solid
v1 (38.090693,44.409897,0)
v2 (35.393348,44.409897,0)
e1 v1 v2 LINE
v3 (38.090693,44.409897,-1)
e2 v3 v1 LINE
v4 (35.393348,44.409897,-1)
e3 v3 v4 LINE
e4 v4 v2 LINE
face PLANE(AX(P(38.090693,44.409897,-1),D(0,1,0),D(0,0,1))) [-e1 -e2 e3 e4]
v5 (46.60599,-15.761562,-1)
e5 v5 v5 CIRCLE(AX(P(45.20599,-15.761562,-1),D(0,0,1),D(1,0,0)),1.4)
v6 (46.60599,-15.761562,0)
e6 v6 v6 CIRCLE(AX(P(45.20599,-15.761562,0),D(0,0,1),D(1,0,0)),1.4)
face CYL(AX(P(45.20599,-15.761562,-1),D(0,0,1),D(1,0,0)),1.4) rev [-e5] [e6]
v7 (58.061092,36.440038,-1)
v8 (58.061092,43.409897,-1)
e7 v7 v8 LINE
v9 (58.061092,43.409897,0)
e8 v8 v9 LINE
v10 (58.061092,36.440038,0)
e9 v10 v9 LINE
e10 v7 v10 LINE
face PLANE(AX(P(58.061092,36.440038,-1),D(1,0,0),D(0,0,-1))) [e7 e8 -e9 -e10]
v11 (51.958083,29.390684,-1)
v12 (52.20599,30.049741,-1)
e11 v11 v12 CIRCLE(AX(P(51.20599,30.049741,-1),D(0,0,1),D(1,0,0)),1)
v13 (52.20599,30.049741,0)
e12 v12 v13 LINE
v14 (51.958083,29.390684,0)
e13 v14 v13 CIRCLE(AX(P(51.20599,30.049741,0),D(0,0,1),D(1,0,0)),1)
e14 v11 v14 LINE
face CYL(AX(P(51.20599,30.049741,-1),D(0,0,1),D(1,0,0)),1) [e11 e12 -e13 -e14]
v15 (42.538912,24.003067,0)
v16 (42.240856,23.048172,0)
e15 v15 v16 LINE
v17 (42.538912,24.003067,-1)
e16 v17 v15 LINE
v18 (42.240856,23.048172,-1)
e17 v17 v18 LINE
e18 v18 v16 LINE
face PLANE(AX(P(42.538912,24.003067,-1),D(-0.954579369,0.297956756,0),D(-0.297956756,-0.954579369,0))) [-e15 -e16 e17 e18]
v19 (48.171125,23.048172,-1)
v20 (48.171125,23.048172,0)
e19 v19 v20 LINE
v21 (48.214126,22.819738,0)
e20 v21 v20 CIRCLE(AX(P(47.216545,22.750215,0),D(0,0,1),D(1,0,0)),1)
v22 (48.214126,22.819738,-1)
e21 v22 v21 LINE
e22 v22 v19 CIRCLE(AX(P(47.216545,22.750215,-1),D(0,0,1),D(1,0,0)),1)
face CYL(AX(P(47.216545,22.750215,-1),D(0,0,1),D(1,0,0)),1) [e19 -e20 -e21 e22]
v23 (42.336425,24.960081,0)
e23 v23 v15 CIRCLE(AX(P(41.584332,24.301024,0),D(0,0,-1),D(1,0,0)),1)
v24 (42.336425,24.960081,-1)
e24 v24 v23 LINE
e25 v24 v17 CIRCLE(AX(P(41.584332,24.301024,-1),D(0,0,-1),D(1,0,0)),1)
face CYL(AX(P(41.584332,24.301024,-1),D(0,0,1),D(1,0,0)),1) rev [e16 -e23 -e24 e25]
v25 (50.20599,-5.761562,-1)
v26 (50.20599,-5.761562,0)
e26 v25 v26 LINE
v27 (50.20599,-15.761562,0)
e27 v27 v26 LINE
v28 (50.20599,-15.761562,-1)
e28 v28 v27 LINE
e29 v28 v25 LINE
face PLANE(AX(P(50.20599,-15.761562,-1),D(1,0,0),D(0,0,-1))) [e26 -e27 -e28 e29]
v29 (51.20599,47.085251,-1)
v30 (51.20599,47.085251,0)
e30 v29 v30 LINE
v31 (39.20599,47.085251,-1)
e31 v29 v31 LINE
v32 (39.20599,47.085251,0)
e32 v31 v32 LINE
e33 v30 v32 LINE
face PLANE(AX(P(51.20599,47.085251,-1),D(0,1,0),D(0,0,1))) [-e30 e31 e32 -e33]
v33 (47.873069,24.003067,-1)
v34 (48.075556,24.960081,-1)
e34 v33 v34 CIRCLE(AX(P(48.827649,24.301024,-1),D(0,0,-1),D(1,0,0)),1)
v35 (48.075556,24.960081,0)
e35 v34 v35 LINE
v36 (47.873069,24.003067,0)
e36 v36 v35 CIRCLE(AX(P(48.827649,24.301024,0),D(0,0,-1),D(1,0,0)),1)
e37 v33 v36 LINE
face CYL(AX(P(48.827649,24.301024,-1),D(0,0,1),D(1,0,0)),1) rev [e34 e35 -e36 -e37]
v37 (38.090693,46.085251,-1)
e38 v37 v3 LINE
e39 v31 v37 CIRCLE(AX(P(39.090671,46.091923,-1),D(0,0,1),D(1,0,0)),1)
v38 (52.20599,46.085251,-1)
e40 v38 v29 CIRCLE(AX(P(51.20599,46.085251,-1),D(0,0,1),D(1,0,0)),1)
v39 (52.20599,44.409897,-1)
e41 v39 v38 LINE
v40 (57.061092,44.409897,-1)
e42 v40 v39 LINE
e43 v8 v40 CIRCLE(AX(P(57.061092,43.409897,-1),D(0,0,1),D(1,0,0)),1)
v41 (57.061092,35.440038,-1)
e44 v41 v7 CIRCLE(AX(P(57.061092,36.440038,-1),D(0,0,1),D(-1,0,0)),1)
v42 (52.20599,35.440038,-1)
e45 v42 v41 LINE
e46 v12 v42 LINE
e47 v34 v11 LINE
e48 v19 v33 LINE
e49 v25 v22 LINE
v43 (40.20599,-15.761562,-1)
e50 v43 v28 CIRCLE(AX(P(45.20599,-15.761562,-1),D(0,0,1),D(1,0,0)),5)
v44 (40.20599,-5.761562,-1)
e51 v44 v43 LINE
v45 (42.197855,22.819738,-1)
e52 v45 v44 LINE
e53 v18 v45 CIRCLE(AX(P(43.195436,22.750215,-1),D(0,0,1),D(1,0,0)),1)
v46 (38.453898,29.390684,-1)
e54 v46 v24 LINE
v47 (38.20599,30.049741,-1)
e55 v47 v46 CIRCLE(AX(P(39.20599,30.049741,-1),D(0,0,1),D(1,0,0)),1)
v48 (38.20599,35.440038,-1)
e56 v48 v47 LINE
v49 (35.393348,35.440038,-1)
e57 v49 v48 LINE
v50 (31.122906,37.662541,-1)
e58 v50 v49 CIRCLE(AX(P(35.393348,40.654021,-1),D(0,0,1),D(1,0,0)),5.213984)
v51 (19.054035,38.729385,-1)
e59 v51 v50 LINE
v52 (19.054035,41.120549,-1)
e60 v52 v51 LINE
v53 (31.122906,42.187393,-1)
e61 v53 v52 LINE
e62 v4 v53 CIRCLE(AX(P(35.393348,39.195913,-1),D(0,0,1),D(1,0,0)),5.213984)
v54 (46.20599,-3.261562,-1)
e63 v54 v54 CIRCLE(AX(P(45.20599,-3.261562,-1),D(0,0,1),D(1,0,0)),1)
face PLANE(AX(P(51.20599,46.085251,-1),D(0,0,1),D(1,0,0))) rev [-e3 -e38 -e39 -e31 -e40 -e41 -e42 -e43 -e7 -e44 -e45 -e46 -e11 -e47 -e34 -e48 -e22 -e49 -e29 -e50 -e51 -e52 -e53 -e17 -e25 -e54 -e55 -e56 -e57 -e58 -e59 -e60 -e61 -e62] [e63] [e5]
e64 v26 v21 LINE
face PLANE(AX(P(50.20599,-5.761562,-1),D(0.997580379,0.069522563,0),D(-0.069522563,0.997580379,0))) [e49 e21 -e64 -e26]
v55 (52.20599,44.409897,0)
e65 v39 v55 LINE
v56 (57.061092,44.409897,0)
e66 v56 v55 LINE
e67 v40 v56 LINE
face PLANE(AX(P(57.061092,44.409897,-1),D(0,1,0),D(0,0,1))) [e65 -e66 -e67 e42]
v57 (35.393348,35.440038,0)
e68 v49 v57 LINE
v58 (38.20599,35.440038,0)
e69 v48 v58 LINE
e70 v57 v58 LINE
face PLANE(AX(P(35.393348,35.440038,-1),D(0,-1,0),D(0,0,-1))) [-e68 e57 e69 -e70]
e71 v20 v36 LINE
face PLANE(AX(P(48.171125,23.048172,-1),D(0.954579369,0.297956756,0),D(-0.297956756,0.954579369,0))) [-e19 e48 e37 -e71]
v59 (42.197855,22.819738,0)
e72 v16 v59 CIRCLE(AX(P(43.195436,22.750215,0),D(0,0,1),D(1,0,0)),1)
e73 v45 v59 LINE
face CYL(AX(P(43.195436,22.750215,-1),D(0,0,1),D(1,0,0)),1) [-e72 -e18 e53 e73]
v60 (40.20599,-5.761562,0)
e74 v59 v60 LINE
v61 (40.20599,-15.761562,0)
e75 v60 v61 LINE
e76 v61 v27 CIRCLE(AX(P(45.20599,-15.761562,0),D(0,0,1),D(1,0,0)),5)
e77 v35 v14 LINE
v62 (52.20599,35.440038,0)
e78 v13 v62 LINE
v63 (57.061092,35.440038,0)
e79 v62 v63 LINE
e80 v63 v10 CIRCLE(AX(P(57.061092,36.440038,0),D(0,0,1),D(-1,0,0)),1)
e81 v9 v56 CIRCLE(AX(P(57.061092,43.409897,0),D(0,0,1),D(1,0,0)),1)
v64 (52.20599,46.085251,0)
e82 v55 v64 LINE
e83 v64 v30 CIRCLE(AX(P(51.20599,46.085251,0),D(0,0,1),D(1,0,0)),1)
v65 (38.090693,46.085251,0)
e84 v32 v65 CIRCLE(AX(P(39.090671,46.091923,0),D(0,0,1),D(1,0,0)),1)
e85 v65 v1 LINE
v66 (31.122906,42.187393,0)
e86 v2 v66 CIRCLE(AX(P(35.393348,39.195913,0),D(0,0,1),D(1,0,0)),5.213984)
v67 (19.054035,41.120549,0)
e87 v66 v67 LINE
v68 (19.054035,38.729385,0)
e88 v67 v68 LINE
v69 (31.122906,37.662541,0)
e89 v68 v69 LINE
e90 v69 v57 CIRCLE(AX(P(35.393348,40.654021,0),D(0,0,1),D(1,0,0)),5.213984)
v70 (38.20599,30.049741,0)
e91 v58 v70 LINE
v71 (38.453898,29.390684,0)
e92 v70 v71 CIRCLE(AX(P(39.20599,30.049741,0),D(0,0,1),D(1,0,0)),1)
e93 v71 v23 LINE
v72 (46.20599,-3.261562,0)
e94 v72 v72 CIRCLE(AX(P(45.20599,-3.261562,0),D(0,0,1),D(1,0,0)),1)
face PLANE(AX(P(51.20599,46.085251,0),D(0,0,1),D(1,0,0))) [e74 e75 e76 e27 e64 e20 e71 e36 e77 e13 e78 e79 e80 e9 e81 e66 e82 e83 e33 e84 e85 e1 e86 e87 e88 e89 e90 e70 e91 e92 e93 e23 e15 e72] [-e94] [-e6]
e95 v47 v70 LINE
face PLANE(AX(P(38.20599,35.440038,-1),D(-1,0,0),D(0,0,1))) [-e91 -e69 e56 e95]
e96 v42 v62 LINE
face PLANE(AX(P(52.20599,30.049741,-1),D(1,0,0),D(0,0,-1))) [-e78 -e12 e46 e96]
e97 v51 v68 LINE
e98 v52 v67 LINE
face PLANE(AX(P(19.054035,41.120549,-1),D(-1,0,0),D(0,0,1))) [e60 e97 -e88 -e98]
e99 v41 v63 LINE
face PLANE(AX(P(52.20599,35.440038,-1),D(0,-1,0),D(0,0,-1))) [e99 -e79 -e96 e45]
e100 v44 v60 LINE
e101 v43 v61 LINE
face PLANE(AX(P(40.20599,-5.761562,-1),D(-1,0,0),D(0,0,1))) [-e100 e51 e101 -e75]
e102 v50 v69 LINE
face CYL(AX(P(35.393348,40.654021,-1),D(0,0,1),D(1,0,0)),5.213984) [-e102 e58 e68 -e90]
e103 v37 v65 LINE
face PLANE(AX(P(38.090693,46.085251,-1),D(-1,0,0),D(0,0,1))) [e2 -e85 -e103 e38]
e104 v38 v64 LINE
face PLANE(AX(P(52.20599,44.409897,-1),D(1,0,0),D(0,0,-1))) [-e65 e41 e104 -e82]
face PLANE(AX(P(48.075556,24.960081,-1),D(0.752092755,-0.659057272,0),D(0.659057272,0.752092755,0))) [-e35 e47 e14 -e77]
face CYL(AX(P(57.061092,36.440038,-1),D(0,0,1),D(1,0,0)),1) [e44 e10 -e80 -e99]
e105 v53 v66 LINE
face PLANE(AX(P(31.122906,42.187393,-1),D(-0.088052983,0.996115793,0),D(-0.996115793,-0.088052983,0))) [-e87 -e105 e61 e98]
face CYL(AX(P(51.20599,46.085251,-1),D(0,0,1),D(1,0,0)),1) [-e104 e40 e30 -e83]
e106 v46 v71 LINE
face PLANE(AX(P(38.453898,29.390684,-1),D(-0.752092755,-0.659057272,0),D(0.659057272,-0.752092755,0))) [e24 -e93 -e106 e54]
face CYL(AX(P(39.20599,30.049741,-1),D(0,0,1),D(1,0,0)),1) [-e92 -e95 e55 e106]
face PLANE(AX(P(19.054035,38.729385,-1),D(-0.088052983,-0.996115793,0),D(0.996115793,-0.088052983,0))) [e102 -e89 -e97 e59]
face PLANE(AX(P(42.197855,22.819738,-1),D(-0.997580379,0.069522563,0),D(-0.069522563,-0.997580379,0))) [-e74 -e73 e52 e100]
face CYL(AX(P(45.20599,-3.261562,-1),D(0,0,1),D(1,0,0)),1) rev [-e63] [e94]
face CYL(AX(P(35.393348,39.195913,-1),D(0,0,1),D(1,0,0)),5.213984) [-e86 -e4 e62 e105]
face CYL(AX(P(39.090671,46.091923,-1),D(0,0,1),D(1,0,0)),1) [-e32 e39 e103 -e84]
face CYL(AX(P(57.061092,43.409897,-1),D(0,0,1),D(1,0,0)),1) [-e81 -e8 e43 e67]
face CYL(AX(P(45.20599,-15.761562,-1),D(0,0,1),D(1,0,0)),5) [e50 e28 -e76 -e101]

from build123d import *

# Parameters (mm, degrees)
MODEL_R           = 1
MODEL_R_2         = 1.4
BRIDA_BASE1_DEPTH = 1


# Sheet-metal steps are written as plain solids
with BuildPart() as part:
    # Model → Brida base1 (new body)
    with BuildSketch(Plane.XY):
        with BuildLine():
            Line((57.06109229, 44.40989684), (52.2059904, 44.40989684))
            Line((52.2059904, 44.40989684), (52.2059904, 46.085251303))
            ThreePointArc((52.2059904, 46.085251303), (51.913097181, 46.792358084), (51.2059904, 47.085251303))
            Line((51.2059904, 47.085251303), (39.2059904, 47.085251303))
            ThreePointArc((39.2059904, 47.085251303), (38.423096783, 46.836466455), (38.090692903, 46.085251454))
            Line((38.090692903, 46.085251454), (38.090692903, 44.40989684))
            Line((38.090692903, 44.40989684), (35.393347813, 44.40989684))
            ThreePointArc((35.393347813, 44.40989684), (32.986264566, 43.82101601), (31.122905732, 42.187392968))
            Line((31.122905732, 42.187392968), (19.054035234, 41.120549071))
            Line((19.054035234, 41.120549071), (19.054035234, 38.729385282))
            Line((19.054035234, 38.729385282), (31.122905732, 37.662541385))
            ThreePointArc((31.122905732, 37.662541385), (32.986264566, 36.028918342), (35.393347813, 35.440037512))
            Line((35.393347813, 35.440037512), (38.2059904, 35.440037512))
            Line((38.2059904, 35.440037512), (38.2059904, 30.049740987))
            ThreePointArc((38.2059904, 30.049740987), (38.270016908, 29.697670508), (38.453897645, 29.390683715))
            Line((38.453897645, 29.390683715), (42.336424948, 24.960081428))
            ThreePointArc((42.336424948, 24.960081428), (42.562673339, 24.508023196), (42.538911562, 24.0030674))
            Line((42.538911562, 24.0030674), (42.240856149, 23.048171958))
            ThreePointArc((42.240856149, 23.048171958), (42.212695742, 22.935208537), (42.197855138, 22.819737764))
            Line((42.197855138, 22.819737764), (40.2059904, -5.7615616))
            Line((40.2059904, -5.7615616), (40.2059904, -15.7615616))
            ThreePointArc((40.2059904, -15.7615616), (45.2059904, -20.7615616), (50.2059904, -15.7615616))
            Line((50.2059904, -15.7615616), (50.2059904, -5.7615616))
            Line((50.2059904, -5.7615616), (48.214125662, 22.819737764))
            ThreePointArc((48.214125662, 22.819737764), (48.199285058, 22.935208537), (48.171124651, 23.048171958))
            Line((48.171124651, 23.048171958), (47.873069238, 24.0030674))
            ThreePointArc((47.873069238, 24.0030674), (47.849307461, 24.508023196), (48.075555852, 24.960081428))
            Line((48.075555852, 24.960081428), (51.958083155, 29.390683715))
            ThreePointArc((51.958083155, 29.390683715), (52.141963892, 29.697670508), (52.2059904, 30.049740987))
            Line((52.2059904, 30.049740987), (52.2059904, 35.440037512))
            Line((52.2059904, 35.440037512), (57.06109229, 35.440037512))
            ThreePointArc((57.06109229, 35.440037512), (57.768199071, 35.732930731), (58.06109229, 36.440037513))
            Line((58.06109229, 36.440037513), (58.06109229, 43.40989684))
            ThreePointArc((58.06109229, 43.40989684), (57.768199071, 44.117003621), (57.06109229, 44.40989684))
        make_face()
        with Locations((45.2059904, -3.2615616)):
            Circle(MODEL_R, mode=Mode.SUBTRACT)
        with Locations((45.2059904, -15.7615616)):
            Circle(MODEL_R_2, mode=Mode.SUBTRACT)
    extrude(amount=-BRIDA_BASE1_DEPTH)


solid = part.part
